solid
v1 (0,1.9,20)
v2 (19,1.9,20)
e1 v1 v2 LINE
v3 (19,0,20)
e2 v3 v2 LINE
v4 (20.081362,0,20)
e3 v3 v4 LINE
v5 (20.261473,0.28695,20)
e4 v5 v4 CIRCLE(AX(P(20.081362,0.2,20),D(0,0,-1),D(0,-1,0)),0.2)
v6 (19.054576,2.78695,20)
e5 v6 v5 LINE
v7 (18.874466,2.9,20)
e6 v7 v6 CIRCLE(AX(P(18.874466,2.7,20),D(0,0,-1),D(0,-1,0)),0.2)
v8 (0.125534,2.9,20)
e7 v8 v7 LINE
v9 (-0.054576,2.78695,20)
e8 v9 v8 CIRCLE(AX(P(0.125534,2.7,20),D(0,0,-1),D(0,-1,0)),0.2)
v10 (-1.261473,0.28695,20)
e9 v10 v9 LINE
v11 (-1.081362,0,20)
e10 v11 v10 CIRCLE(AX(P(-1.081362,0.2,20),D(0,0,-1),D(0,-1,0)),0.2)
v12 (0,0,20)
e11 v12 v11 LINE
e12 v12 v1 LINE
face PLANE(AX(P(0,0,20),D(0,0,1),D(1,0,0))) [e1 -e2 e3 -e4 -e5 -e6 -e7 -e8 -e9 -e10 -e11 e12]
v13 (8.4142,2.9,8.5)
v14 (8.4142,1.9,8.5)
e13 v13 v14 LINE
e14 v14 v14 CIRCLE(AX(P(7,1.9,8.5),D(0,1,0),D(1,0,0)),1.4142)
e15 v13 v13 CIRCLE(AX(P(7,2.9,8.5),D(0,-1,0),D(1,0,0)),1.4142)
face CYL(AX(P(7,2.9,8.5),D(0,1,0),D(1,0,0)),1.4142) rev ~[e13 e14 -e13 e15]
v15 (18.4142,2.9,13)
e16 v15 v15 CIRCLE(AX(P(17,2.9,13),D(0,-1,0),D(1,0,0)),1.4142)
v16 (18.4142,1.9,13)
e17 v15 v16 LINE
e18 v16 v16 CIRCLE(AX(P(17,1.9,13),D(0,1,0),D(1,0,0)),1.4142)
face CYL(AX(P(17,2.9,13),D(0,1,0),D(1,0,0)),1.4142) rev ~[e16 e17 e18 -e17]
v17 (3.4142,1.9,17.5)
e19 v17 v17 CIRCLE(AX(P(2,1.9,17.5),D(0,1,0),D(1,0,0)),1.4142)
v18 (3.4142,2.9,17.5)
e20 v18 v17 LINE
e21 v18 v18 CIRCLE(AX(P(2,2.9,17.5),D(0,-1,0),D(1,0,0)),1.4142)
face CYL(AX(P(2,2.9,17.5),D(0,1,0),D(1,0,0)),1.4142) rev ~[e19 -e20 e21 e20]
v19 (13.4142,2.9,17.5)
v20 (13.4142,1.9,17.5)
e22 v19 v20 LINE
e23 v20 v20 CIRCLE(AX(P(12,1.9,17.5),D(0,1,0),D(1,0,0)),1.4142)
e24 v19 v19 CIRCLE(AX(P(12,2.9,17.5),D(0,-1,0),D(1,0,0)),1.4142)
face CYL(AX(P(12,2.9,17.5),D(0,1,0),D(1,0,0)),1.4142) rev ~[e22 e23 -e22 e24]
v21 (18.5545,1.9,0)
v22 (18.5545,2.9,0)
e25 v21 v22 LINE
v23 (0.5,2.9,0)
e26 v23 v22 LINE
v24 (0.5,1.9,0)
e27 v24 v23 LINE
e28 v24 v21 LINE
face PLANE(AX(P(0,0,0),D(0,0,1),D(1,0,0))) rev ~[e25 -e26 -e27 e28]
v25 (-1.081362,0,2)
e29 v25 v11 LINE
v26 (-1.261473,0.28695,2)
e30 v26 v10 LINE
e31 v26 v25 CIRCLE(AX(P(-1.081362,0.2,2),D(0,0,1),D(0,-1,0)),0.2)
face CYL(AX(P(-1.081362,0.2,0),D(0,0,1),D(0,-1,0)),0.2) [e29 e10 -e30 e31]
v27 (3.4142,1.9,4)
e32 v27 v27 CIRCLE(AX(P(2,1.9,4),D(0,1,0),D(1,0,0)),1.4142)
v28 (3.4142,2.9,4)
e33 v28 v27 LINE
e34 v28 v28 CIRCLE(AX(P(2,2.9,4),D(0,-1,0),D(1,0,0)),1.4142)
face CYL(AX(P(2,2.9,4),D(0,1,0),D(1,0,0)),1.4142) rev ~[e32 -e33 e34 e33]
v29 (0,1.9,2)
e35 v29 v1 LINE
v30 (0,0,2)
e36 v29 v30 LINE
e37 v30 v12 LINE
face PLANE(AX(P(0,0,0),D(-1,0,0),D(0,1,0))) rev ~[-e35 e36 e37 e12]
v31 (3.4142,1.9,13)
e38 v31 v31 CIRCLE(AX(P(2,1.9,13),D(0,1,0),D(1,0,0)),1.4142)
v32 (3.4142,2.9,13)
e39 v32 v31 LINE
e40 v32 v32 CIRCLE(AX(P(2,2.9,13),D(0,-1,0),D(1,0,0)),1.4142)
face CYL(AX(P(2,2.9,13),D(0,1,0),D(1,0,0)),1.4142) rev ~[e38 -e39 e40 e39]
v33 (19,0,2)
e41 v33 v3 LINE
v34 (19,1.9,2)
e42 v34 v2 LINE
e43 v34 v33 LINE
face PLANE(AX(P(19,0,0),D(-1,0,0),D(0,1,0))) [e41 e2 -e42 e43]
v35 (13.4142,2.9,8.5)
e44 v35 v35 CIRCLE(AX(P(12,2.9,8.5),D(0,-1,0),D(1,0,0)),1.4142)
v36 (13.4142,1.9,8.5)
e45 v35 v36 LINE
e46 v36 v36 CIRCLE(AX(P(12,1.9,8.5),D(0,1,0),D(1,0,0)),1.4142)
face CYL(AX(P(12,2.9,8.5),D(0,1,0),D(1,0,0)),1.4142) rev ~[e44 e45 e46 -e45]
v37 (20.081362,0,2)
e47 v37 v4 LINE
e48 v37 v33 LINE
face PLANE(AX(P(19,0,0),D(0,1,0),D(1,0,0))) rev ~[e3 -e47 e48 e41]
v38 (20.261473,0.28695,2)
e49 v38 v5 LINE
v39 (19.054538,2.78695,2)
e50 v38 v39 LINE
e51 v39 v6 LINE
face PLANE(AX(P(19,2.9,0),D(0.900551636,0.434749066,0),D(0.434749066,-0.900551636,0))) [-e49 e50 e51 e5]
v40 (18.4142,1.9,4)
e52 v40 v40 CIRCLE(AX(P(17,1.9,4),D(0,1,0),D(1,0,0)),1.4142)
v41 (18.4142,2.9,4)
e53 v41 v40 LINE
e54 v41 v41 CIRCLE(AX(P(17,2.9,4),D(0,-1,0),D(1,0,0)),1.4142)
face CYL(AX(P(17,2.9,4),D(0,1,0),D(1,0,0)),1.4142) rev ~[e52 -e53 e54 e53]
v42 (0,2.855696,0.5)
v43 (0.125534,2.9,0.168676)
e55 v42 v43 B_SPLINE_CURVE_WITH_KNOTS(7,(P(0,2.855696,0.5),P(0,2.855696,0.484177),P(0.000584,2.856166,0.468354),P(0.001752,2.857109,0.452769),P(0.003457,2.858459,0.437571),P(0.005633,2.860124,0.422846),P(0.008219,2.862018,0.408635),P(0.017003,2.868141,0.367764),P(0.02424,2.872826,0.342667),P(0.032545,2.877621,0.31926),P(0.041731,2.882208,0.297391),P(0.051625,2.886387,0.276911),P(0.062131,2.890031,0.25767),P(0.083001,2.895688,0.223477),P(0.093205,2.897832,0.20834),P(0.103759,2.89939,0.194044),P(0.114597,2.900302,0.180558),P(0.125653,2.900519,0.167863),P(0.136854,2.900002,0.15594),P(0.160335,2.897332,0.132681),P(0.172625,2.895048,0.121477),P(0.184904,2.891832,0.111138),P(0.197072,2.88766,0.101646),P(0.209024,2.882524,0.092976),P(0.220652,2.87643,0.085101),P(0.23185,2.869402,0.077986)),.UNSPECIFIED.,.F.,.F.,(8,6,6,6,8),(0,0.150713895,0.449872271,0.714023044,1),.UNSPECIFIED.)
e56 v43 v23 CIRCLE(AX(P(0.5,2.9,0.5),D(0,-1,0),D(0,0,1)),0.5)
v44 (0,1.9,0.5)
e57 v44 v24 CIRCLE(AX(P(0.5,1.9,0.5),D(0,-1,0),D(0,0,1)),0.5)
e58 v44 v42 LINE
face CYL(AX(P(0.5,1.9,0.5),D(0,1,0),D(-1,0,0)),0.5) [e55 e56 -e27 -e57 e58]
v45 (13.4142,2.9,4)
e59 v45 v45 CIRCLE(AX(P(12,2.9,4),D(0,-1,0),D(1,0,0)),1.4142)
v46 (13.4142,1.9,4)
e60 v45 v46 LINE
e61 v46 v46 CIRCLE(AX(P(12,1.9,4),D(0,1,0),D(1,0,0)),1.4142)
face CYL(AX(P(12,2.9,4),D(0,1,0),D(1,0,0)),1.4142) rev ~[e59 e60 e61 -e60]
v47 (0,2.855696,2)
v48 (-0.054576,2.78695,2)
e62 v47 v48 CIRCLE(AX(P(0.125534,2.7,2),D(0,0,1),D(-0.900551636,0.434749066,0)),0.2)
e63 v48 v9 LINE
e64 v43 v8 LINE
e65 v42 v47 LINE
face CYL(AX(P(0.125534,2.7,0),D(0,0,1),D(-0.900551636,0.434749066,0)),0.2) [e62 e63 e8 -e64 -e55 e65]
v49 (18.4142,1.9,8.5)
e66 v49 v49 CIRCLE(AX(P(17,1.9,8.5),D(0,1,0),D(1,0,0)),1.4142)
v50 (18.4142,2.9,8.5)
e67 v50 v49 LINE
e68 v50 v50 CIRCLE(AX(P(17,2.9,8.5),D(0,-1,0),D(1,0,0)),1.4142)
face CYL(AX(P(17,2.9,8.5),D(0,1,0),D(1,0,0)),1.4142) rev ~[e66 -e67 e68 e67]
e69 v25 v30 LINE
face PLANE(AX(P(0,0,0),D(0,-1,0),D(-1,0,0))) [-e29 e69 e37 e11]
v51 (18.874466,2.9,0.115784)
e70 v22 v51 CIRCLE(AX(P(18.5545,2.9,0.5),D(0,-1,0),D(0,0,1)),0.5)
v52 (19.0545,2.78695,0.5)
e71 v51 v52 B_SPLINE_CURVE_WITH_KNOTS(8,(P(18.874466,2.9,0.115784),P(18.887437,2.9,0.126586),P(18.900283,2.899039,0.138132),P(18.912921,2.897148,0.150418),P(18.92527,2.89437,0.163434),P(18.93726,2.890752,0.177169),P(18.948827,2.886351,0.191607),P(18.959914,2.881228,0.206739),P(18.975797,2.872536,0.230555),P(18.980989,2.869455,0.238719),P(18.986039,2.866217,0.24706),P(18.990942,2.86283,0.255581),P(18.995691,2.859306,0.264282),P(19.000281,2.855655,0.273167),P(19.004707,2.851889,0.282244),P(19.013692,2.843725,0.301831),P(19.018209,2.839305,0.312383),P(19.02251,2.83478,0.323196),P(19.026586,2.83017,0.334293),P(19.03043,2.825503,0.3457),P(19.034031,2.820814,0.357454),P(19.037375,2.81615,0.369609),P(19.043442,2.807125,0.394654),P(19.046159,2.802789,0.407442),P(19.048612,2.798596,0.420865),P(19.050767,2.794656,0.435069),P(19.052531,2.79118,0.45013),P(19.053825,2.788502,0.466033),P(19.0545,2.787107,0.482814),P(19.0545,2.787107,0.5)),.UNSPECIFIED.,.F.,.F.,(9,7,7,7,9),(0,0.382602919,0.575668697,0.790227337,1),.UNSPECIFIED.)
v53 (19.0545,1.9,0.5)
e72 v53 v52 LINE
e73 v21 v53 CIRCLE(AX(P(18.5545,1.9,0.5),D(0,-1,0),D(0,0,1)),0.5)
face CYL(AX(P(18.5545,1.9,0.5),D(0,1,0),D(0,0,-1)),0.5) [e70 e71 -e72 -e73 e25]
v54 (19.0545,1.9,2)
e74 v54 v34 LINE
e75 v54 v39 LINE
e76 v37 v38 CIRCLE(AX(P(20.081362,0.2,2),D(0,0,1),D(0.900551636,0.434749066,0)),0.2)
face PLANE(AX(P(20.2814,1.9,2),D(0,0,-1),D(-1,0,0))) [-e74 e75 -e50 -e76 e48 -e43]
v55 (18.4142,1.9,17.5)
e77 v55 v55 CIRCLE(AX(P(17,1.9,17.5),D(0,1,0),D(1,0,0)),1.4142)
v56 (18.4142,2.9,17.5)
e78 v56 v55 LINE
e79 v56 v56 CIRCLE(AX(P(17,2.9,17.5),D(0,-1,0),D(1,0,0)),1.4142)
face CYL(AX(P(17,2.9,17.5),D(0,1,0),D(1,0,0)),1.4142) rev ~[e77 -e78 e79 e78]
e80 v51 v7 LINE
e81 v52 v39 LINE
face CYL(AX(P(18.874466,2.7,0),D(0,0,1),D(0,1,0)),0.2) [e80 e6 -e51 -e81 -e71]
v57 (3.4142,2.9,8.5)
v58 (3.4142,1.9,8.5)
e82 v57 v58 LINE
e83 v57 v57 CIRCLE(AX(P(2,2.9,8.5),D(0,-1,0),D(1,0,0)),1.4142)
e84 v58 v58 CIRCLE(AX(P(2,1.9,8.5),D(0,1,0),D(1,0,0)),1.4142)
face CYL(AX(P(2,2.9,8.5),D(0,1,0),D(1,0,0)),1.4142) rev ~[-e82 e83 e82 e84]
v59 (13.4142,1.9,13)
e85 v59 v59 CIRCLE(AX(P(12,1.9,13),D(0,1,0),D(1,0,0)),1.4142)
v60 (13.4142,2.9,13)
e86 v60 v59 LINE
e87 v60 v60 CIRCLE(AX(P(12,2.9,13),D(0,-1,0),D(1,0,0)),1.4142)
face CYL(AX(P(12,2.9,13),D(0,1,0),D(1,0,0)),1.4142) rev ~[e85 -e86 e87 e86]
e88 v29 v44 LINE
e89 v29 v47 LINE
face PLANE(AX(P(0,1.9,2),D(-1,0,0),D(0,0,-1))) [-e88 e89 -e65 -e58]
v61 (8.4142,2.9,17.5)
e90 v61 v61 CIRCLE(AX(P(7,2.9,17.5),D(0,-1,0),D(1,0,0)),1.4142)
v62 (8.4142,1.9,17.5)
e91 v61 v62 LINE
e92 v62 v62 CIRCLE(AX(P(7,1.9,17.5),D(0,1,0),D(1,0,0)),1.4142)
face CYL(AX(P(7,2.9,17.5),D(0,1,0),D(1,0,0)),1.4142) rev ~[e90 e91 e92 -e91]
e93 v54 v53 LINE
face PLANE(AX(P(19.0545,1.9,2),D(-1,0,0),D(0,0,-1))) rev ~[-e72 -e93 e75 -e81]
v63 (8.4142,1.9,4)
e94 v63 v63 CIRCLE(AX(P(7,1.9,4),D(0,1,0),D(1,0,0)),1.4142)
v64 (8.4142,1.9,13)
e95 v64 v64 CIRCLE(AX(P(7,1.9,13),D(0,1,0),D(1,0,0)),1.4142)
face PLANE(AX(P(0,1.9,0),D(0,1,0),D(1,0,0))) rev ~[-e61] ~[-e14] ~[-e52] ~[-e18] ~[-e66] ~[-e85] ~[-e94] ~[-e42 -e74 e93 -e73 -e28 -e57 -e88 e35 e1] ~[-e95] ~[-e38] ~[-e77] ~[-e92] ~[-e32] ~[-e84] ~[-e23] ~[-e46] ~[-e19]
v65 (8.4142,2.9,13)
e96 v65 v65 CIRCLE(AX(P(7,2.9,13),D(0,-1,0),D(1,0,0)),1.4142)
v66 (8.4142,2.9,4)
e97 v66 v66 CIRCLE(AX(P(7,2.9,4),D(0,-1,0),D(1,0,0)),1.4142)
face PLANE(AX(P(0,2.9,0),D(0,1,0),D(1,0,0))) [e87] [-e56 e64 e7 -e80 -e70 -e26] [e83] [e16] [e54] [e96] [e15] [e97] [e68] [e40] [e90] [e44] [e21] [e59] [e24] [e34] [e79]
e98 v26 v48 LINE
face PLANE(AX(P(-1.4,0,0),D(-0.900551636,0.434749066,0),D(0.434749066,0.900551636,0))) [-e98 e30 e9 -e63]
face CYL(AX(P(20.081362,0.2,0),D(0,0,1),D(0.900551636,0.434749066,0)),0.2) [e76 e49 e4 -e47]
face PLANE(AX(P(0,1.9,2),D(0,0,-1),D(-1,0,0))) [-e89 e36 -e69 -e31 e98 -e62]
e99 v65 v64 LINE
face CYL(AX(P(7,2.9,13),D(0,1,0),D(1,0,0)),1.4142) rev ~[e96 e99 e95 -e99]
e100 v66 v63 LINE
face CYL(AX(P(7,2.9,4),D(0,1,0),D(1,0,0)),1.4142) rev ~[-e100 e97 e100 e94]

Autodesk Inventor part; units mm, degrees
ref_plane "YZ Plane" through (0, 0, 0) normal (1, 0, 0) x (0, 1, 0)
ref_plane "XZ Plane" through (0, 0, 0) normal (0, 1, 0) x (-1, 0, 0)
ref_plane "XY Plane" through (0, 0, 0) normal (0, 0, 1) x (1, 0, 0)
sketch "Sketch1" plane through (0, 0, 0) normal (0, 0, 1) x (1, 0, 0)
  line L0 (0, 0) -> (19, 0)
  line L1 (19, 0) -> (20.4, 0)
  line L2 (0, 0) -> (-1.4, 0)
  line L3 (0, 0) -> (0, 1.9)
  line L4 (-1.4, 0) -> (0, 2.9)
  line L5 (19, 0) -> (19, 1.9)
  line L6 (19, 2.9) -> (20.4, 0)
  line L7 (0, 2.9) -> (19, 2.9)
  line L8 (0, 1.9) -> (19, 1.9)
  dimension "d0" = 19
  dimension "d1" = 1.4
  dimension "d2" = 1.4
  dimension "d3" = 2.9
  dimension "d4" = 2.9
  dimension "d5" = 1
extrude "Extrusion1" add sketch "Sketch1" along normal blind 20 contours L2 L4 L7 L6 L1 L5 L8 L3
fillet "Fillet1" radius 0.2 4 edges at (0, 2.9, 10) (19, 2.9, 10) (20.4, 0, 10) (-1.4, 0, 10)
sketch "Sketch2" plane through (0, 1.9, 0) normal (0, -1, 0) x (1, 0, 0)
  line L0 (-1.2814, 0) -> (-1.2814, 20) projected
  line L1 (0, 0) -> (0, 20) projected
  line L2 (-1.2814, 0) -> (0, 0)
  line L3 (0, 0) -> (0, 2)
  line L4 (0, 2) -> (-1.2814, 2)
  line L5 (-1.2814, 2) -> (-1.2814, 0)
  line L6 (19, 0) -> (19, 20) projected
  line L7 (20.2814, 0) -> (20.2814, 20) projected
  line L8 (19, 0) -> (20.2814, 0)
  line L9 (20.2814, 0) -> (20.2814, 2)
  line L10 (20.2814, 2) -> (19, 2)
  line L11 (19, 2) -> (19, 0)
  dimension "d9" = 2
  dimension "d10" = 2
extrude "Extrusion2" cut sketch "Sketch2" along normal blind 20
sketch "Sketch3" plane through (0.1255, 2.9, 0) normal (0, 1, 0) x (1, 0, 0)
  line L0 (-0.1255, -2) -> (-0.6083, -2) projected
  line L1 (18.7489, 0) -> (18.7489, -20) projected
  line L2 (-0.1255, -2) -> (18.7489, -2)
  line L3 (18.7489, -2) -> (18.7489, -20)
  line L4 (18.7489, -20) -> (-0.1255, -20)
  line L5 (-0.1255, -20) -> (-0.1255, -2)
  line L6 (-0.1255, -2) -> (-0.1255, -20) projected
  line L7 (-0.1255, -2) -> (1.8745, -2)
  line L8 (1.8745, -2) -> (1.8745, -4)
  line L9 (0.8745, -5) -> (2.8745, -5)
  line L10 (2.8745, -5) -> (2.8745, -3)
  line L11 (2.8745, -3) -> (0.8745, -3)
  line L12 (0.8745, -3) -> (0.8745, -5)
  line L13 (0.8745, -5) -> (2.8745, -3) construction
  line L14 (2.8745, -5) -> (0.8745, -3) construction
  line L15 (7.8745, -3) -> (5.8745, -3)
  line L16 (5.8745, -3) -> (5.8745, -5)
  line L17 (7.8745, -5) -> (7.8745, -3)
  line L18 (5.8745, -5) -> (7.8745, -5)
  line L19 (12.8745, -3) -> (10.8745, -3)
  line L20 (10.8745, -3) -> (10.8745, -5)
  line L21 (12.8745, -5) -> (12.8745, -3)
  line L22 (10.8745, -5) -> (12.8745, -5)
  line L23 (17.8745, -3) -> (15.8745, -3)
  line L24 (15.8745, -3) -> (15.8745, -5)
  line L25 (17.8745, -5) -> (17.8745, -3)
  line L26 (15.8745, -5) -> (17.8745, -5)
  line L27 (2.8745, -7.5) -> (0.8745, -7.5)
  line L28 (0.8745, -7.5) -> (0.8745, -9.5)
  line L29 (2.8745, -9.5) -> (2.8745, -7.5)
  line L30 (0.8745, -9.5) -> (2.8745, -9.5)
  line L31 (7.8745, -7.5) -> (5.8745, -7.5)
  line L32 (5.8745, -7.5) -> (5.8745, -9.5)
  line L33 (7.8745, -9.5) -> (7.8745, -7.5)
  line L34 (5.8745, -9.5) -> (7.8745, -9.5)
  line L35 (12.8745, -7.5) -> (10.8745, -7.5)
  line L36 (10.8745, -7.5) -> (10.8745, -9.5)
  line L37 (12.8745, -9.5) -> (12.8745, -7.5)
  line L38 (10.8745, -9.5) -> (12.8745, -9.5)
  line L39 (17.8745, -7.5) -> (15.8745, -7.5)
  line L40 (15.8745, -7.5) -> (15.8745, -9.5)
  line L41 (17.8745, -9.5) -> (17.8745, -7.5)
  line L42 (15.8745, -9.5) -> (17.8745, -9.5)
  line L43 (2.8745, -12) -> (0.8745, -12)
  line L44 (0.8745, -12) -> (0.8745, -14)
  line L45 (2.8745, -14) -> (2.8745, -12)
  line L46 (0.8745, -14) -> (2.8745, -14)
  line L47 (7.8745, -12) -> (5.8745, -12)
  line L48 (5.8745, -12) -> (5.8745, -14)
  line L49 (7.8745, -14) -> (7.8745, -12)
  line L50 (5.8745, -14) -> (7.8745, -14)
  line L51 (12.8745, -12) -> (10.8745, -12)
  line L52 (10.8745, -12) -> (10.8745, -14)
  line L53 (12.8745, -14) -> (12.8745, -12)
  line L54 (10.8745, -14) -> (12.8745, -14)
  line L55 (17.8745, -12) -> (15.8745, -12)
  line L56 (15.8745, -12) -> (15.8745, -14)
  line L57 (17.8745, -14) -> (17.8745, -12)
  line L58 (15.8745, -14) -> (17.8745, -14)
  line L59 (2.8745, -16.5) -> (0.8745, -16.5)
  line L60 (0.8745, -16.5) -> (0.8745, -18.5)
  line L61 (2.8745, -18.5) -> (2.8745, -16.5)
  line L62 (0.8745, -18.5) -> (2.8745, -18.5)
  line L63 (7.8745, -16.5) -> (5.8745, -16.5)
  line L64 (5.8745, -16.5) -> (5.8745, -18.5)
  line L65 (7.8745, -18.5) -> (7.8745, -16.5)
  line L66 (5.8745, -18.5) -> (7.8745, -18.5)
  line L67 (12.8745, -16.5) -> (10.8745, -16.5)
  line L68 (10.8745, -16.5) -> (10.8745, -18.5)
  line L69 (12.8745, -18.5) -> (12.8745, -16.5)
  line L70 (10.8745, -18.5) -> (12.8745, -18.5)
  line L71 (17.8745, -16.5) -> (15.8745, -16.5)
  line L72 (15.8745, -16.5) -> (15.8745, -18.5)
  line L73 (17.8745, -18.5) -> (17.8745, -16.5)
  line L74 (15.8745, -18.5) -> (17.8745, -18.5)
  circle A0 centre (1.8745, -4) radius 1.4142
  circle A1 centre (6.8745, -4) radius 1.4142
  circle A2 centre (11.8745, -4) radius 1.4142
  circle A3 centre (16.8745, -4) radius 1.4142
  circle A4 centre (1.8745, -8.5) radius 1.4142
  circle A5 centre (6.8745, -8.5) radius 1.4142
  circle A6 centre (11.8745, -8.5) radius 1.4142
  circle A7 centre (16.8745, -8.5) radius 1.4142
  circle A8 centre (1.8745, -13) radius 1.4142
  circle A9 centre (6.8745, -13) radius 1.4142
  circle A10 centre (11.8745, -13) radius 1.4142
  circle A11 centre (16.8745, -13) radius 1.4142
  circle A12 centre (1.8745, -17.5) radius 1.4142
  circle A13 centre (6.8745, -17.5) radius 1.4142
  circle A14 centre (11.8745, -17.5) radius 1.4142
  circle A15 centre (16.8745, -17.5) radius 1.4142
  point P0 (-0.1255, 0)
  dimension "d13" = 2
  dimension "d14" = 2
  dimension "d15" = 2
  dimension "d16" = 2
  dimension "d19" = 5
  dimension "d22" = 4.5
  dimension "d32" = 5
  dimension "d35" = 4.5
extrude "Extrusion3" cut sketch "Sketch3" against normal through all contours A0 L11 L8 | L8 L11 A0 | L11 L10 L9 L12 | A0 L10 | L12 A0 | A0 L9 | L17 L18 L16 L15 | A1 L17 | L15 A1 | L16 A1 | A1 L18 | L21 L22 L20 L19 | A2 L21 | L19 A2 | L20 A2 | A2 L22 | L25 L26 L24 L23 | A3 L25 | L23 A3 | L24 A3 | A3 L26 | L29 L30 L28 L27 | A4 L29 | L27 A4 | L28 A4 | A4 L30 | L33 L34 L32 L31 | A5 L33 | L31 A5 | L32 A5 | A5 L34 | L37 L38 L36 L35 | A6 L37 | L35 A6 | L36 A6 | A6 L38 | L41 L42 L40 L39 | A7 L41 | L39 A7 | L40 A7 | A7 L42 | L45 L46 L44 L43 | A8 L45 | L43 A8 | L44 A8 | A8 L46 | L49 L50 L48 L47 | A9 L49 | L47 A9 | L48 A9 | A9 L50 | L53 L54 L52 L51 | A10 L53 | L51 A10 | L52 A10 | A10 L54 | L57 L58 L56 L55 | A11 L57 | L55 A11 | L56 A11 | A11 L58 | L61 L62 L60 L59 | A12 L61 | L59 A12 | L60 A12 | A12 L62 | L65 L66 L64 L63 | A13 L65 | L63 A13 | L64 A13 | A13 L66 | L69 L70 L68 L67 | A14 L69 | L67 A14 | L68 A14 | A14 L70 | L73 L74 L72 L71 | A15 L73 | L71 A15 | L72 A15 | A15 L74
sketch "Sketch4" plane through (-0.4828, 1.9, 0) normal (0, -1, 0) x (1, 0, 0)
  line L0 (0, 0) -> (0, 2) projected
  line L1 (0, 2) -> (0.4828, 2)
  line L2 (0.4828, 2) -> (0.4828, 0)
  line L3 (0.4828, 0) -> (0, 0)
  line L4 (0, 0) -> (0, 2)
  line L5 (19.9655, 2) -> (19.9655, 0) projected
  line L6 (19.9655, 0) -> (19.5373, 0) projected
  line L7 (19.9655, 2) -> (19.5373, 2)
  line L8 (19.5373, 2) -> (19.5373, 0)
  line L9 (19.5373, 0) -> (19.9655, 0)
  line L10 (19.9655, 0) -> (19.9655, 2)
extrude "Extrusion4" cut sketch "Sketch4" against normal blind 20
fillet "Fillet2" radius 0.5 2 edges at (19.0546, 2.3435, 0) (0, 2.3778, 0)
properties part number "flange2_grip_support"
